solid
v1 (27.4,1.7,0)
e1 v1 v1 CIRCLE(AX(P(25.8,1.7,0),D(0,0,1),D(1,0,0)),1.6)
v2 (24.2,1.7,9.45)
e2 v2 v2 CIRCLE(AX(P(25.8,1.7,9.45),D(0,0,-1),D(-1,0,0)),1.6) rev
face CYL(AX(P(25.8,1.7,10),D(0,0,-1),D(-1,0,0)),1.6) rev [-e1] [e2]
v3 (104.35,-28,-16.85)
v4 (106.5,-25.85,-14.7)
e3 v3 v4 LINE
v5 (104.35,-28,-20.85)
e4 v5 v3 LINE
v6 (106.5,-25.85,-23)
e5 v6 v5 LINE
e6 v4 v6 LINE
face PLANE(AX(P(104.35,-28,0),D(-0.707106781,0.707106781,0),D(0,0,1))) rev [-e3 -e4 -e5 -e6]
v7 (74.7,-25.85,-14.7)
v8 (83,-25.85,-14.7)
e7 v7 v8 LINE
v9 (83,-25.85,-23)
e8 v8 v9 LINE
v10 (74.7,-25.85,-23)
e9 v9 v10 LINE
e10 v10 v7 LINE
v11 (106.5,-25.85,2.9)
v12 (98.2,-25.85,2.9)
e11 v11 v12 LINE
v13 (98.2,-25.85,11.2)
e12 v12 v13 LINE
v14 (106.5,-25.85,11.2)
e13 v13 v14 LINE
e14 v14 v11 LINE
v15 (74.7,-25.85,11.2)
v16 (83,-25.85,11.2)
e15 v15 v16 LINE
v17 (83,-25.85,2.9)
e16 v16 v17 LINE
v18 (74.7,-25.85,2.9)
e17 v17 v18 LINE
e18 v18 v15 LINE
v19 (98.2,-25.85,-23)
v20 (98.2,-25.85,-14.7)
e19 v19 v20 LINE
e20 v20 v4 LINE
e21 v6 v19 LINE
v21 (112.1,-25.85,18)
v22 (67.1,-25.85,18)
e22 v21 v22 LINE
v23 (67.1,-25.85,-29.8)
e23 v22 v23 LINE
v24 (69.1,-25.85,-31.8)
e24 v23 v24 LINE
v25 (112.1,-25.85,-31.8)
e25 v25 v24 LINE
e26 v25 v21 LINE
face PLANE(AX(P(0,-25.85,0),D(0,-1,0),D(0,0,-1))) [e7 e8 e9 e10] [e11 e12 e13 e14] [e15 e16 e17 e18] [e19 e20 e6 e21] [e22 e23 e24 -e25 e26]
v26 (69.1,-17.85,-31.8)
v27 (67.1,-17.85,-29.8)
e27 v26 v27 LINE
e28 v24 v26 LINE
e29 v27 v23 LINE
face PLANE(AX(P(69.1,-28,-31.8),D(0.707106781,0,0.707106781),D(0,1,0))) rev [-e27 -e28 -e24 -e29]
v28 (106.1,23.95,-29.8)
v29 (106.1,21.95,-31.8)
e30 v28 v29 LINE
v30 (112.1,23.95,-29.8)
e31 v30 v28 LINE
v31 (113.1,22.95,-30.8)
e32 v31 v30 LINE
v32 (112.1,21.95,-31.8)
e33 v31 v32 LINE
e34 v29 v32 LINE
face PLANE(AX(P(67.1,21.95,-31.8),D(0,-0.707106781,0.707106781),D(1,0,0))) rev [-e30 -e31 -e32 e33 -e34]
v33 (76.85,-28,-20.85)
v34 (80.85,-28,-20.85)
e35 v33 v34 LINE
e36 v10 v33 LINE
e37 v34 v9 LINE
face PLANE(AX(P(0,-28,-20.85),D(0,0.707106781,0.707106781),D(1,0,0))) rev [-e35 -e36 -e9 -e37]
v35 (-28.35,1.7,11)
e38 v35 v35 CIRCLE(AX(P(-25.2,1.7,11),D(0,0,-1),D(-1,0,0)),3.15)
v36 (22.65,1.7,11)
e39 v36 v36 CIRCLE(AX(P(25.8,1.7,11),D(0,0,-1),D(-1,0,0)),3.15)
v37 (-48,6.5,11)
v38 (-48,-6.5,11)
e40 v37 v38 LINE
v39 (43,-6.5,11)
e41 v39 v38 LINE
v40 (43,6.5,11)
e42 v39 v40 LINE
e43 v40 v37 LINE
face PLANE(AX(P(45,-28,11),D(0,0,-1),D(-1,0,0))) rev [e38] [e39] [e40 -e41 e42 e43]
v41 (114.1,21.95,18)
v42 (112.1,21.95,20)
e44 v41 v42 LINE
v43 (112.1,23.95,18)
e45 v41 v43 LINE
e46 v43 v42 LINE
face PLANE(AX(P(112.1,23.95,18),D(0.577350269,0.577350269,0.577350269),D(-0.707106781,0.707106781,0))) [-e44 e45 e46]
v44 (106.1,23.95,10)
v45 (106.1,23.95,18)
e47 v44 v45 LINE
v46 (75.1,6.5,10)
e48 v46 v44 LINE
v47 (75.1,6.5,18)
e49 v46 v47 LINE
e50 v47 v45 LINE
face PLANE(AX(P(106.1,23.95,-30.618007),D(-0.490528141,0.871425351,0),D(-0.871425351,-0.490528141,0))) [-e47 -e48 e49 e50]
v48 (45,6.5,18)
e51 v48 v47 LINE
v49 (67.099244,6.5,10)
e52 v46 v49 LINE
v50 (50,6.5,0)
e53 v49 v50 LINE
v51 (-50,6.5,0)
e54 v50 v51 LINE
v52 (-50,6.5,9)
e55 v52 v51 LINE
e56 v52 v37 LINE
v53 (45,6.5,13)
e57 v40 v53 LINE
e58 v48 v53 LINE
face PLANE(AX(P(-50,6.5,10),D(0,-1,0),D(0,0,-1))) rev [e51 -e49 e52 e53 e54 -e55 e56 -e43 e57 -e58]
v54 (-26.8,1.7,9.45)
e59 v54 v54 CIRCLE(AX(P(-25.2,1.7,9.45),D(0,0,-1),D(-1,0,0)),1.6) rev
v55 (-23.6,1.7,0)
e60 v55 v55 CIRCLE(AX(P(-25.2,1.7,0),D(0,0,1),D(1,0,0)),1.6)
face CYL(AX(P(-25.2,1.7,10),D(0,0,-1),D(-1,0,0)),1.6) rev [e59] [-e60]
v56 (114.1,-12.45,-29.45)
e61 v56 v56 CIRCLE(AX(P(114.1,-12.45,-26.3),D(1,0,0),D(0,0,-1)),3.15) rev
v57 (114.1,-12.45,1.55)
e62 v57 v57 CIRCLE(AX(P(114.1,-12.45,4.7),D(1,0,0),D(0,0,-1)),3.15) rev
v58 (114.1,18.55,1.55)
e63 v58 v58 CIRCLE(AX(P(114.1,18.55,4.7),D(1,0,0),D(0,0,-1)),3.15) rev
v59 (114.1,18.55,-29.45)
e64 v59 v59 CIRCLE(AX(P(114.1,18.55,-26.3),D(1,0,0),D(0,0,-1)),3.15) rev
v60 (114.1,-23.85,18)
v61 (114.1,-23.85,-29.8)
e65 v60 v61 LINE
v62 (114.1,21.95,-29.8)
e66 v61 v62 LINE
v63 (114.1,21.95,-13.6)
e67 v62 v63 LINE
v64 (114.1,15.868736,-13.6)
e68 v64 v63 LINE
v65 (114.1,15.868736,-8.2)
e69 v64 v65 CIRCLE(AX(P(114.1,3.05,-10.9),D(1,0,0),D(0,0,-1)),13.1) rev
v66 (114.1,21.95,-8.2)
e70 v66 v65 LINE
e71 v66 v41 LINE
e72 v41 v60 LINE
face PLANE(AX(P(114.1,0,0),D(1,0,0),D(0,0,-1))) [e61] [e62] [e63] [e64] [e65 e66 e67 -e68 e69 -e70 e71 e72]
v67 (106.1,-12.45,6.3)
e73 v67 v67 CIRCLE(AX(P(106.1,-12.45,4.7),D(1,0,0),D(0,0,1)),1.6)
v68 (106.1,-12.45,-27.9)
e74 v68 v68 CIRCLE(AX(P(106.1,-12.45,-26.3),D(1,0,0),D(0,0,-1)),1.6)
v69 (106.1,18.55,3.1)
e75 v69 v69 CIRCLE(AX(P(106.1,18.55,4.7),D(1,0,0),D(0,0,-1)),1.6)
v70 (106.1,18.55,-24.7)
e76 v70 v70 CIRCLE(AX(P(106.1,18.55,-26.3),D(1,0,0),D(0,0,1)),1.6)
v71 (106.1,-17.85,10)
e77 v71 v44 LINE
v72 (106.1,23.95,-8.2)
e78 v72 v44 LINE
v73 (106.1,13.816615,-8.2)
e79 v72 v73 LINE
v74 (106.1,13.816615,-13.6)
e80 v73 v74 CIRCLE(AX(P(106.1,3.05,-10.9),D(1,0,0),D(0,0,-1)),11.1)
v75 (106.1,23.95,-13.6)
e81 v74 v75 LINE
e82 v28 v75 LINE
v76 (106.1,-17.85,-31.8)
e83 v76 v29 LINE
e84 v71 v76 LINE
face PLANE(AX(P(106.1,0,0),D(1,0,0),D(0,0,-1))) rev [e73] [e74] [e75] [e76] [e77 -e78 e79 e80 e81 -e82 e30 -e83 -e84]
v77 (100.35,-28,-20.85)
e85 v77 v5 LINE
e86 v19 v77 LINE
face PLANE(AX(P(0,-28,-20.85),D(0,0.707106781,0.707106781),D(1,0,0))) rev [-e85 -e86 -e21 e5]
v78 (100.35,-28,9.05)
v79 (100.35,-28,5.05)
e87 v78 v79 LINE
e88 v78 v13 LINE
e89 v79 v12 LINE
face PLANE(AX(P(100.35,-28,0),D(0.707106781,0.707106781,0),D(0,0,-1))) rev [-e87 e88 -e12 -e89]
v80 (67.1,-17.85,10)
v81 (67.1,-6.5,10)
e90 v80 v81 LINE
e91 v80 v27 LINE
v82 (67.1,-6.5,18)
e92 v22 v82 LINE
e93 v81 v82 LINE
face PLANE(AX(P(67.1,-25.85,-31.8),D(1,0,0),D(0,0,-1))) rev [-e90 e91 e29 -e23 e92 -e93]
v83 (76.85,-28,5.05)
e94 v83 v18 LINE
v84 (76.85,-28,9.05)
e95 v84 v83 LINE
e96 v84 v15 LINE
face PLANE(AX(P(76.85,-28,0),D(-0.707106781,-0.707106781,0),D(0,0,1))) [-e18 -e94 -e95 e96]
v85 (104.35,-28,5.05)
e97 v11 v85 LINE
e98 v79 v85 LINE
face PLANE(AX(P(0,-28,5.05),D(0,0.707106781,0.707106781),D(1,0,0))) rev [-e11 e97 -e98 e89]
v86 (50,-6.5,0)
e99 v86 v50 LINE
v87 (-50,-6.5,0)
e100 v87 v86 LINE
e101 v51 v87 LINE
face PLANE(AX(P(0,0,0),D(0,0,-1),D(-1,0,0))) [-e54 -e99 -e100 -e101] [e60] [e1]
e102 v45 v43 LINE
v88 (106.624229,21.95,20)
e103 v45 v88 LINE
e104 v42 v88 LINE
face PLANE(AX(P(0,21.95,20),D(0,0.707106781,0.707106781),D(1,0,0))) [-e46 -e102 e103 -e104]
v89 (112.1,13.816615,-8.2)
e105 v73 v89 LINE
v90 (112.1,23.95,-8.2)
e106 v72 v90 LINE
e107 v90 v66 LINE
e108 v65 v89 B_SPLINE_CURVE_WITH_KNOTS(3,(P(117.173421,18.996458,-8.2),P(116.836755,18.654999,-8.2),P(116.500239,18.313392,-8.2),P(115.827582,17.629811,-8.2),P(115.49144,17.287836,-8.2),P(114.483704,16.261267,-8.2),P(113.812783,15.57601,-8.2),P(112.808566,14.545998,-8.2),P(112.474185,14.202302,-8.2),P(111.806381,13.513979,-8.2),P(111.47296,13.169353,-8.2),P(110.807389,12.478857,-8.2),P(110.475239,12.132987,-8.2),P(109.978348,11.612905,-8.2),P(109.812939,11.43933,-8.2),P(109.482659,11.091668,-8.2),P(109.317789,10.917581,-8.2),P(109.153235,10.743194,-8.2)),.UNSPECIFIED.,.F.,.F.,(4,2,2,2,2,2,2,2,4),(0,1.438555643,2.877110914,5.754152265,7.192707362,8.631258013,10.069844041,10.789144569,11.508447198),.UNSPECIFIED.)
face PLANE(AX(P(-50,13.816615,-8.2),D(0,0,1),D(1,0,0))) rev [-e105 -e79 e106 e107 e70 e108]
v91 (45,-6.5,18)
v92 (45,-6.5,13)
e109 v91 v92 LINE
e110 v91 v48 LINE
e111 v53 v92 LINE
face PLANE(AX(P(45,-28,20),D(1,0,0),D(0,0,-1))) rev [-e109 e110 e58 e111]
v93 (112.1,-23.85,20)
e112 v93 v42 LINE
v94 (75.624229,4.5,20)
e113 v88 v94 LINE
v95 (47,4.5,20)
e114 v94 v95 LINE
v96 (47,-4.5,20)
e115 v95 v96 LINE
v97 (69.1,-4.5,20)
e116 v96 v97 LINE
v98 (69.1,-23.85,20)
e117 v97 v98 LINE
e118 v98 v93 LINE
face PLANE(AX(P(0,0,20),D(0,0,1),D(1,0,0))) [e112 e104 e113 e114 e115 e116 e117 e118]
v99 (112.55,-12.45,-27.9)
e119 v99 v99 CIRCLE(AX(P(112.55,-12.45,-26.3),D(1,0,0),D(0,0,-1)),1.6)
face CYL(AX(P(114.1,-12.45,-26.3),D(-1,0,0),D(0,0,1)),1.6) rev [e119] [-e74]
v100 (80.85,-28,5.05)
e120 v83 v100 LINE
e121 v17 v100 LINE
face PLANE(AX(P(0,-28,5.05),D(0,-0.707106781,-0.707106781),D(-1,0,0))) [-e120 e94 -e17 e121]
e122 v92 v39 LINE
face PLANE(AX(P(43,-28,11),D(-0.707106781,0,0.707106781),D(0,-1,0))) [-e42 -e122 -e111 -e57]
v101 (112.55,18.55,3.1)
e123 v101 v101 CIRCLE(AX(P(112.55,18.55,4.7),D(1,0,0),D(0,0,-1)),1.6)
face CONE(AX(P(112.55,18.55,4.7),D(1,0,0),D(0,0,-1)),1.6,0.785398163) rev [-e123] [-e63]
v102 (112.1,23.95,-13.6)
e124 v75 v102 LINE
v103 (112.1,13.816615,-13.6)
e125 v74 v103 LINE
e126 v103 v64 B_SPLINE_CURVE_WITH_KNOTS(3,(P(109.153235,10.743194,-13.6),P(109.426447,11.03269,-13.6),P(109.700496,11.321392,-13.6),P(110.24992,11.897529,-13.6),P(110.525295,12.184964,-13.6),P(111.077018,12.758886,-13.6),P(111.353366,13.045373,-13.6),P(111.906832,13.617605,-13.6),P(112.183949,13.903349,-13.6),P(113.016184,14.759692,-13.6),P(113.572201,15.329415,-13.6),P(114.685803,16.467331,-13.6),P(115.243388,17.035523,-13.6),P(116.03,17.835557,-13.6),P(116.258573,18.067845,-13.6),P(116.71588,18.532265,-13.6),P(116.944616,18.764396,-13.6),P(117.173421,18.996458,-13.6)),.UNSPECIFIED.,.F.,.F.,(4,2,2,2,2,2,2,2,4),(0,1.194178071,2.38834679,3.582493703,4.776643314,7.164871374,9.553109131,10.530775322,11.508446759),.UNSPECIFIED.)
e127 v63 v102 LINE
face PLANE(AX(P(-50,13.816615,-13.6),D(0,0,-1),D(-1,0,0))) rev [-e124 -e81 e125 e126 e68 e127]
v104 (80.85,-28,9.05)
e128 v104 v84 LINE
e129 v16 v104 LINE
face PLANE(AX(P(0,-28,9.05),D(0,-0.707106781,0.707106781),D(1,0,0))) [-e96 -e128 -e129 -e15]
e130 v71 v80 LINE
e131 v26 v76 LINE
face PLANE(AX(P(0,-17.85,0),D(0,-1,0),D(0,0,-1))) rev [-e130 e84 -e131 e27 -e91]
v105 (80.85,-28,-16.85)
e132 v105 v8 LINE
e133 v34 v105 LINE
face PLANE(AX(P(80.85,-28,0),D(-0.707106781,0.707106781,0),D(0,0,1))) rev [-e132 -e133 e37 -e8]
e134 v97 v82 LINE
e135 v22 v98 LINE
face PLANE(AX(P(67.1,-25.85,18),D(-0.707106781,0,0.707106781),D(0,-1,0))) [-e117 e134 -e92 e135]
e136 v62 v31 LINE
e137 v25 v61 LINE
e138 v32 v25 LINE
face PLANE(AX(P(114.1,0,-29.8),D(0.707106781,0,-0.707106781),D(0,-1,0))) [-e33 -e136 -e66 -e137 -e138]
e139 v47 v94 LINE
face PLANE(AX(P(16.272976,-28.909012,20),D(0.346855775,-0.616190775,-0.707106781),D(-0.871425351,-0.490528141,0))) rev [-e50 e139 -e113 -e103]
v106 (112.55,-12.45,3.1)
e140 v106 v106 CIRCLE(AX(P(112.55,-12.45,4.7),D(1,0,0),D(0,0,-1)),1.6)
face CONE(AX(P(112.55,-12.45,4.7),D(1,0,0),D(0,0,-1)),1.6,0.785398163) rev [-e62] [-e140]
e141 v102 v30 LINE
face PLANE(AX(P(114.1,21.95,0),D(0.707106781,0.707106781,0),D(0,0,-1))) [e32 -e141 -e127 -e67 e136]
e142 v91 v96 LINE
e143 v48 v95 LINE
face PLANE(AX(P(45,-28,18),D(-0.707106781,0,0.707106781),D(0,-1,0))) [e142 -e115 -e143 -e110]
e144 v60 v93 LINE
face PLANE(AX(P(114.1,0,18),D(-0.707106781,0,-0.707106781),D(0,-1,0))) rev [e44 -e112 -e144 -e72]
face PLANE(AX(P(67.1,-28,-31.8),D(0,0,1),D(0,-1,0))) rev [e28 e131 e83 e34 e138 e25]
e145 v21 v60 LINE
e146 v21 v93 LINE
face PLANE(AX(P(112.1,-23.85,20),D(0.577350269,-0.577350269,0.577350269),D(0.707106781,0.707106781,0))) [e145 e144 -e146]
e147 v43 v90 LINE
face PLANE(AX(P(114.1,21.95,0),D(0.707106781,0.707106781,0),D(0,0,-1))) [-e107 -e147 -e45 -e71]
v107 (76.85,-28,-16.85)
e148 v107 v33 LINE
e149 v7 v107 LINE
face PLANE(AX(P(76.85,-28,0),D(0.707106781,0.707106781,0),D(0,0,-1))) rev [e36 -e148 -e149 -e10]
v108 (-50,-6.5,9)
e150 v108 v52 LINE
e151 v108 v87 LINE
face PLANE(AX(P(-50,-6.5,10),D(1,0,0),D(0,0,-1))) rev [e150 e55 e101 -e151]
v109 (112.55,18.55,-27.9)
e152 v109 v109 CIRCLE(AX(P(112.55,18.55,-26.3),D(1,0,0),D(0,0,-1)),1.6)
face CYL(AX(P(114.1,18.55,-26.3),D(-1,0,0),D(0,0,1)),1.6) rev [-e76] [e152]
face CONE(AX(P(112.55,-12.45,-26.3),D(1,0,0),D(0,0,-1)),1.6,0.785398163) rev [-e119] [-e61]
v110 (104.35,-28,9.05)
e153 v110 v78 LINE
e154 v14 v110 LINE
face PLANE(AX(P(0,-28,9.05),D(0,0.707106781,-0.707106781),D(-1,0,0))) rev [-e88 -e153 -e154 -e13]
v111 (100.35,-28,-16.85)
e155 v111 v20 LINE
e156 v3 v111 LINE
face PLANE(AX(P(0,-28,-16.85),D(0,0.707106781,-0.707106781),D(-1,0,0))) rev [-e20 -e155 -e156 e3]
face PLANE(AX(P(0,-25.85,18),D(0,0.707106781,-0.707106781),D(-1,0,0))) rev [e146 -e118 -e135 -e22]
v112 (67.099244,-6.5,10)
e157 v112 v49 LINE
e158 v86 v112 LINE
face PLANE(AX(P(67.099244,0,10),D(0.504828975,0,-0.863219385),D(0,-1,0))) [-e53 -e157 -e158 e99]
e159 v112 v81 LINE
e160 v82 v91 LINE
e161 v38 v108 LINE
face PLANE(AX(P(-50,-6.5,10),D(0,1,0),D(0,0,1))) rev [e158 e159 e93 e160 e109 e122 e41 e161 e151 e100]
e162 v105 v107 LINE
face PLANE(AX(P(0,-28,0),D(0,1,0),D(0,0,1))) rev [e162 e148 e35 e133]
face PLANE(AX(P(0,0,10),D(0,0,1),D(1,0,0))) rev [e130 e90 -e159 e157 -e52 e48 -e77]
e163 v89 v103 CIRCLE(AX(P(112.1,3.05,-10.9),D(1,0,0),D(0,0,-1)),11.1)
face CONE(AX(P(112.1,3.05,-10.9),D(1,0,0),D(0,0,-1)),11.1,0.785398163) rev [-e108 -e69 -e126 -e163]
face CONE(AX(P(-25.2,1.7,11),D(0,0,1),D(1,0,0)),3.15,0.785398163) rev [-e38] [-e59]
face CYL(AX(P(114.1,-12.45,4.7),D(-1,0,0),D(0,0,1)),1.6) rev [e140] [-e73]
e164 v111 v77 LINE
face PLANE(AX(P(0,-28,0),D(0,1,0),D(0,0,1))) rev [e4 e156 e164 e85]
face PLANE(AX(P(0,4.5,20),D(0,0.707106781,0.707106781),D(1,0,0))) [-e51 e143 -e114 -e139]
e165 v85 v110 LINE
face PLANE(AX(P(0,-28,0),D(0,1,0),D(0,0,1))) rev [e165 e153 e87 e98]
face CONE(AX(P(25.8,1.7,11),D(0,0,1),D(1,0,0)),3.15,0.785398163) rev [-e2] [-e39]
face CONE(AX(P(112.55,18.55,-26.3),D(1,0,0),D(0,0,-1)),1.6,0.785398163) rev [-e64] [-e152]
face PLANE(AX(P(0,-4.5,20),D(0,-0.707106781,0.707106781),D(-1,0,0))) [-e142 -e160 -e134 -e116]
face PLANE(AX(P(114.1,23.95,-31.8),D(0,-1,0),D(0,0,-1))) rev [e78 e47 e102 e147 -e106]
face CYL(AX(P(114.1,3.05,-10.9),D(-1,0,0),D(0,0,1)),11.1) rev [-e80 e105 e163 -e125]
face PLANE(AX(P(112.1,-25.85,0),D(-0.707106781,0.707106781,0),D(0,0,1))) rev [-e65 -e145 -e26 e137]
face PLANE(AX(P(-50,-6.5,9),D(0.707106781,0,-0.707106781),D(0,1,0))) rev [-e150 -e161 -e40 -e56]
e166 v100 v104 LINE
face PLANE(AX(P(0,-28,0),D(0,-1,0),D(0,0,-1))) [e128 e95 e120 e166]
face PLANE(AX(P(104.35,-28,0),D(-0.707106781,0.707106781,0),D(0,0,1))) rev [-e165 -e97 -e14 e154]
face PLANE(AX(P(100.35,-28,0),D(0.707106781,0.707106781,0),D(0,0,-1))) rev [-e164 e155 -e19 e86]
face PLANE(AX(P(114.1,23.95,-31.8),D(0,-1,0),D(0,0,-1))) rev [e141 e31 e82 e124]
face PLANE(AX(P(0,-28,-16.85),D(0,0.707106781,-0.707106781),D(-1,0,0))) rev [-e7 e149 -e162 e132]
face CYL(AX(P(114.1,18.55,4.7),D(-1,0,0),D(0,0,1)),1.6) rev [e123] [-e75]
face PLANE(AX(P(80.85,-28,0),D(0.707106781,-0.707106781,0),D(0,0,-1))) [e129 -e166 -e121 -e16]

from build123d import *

# Parameters (mm, degrees)
SKETCH1_W           = 100
SKETCH1_H           = 13
SKETCH1_R           = 1.6
BOSS_EXTRUDE1_DEPTH = 10
SKETCH2_R           = 1.6
BOSS_EXTRUDE2_DEPTH = 10
SKETCH4_R           = 1.6
SKETCH4_R_2         = 11.1
BOSS_EXTRUDE3_DEPTH = 8
SKETCH5_W           = 47
SKETCH5_H           = 51.8
BOSS_EXTRUDE4_DEPTH = 8
SKETCH6_W           = 39
SKETCH6_H           = 11.35
BOSS_EXTRUDE5_DEPTH = 10
BOSS_EXTRUDE6_DEPTH = 8
SKETCH8_W           = 10
SKETCH8_H           = 10
BOSS_EXTRUDE7_DEPTH = 2.15
CHAMFER1_SIZE2      = 17.09924405
CHAMFER1_SIZE       = 10
CHAMFER3_SIZE       = 2
CHAMFER4_SIZE       = 3
CHAMFER5_SIZE       = 1.55
SKETCH9_W           = 95
SKETCH9_H           = 9
CUT_EXTRUDE1_DEPTH  = 126.670601176
CHAMFER6_SIZE       = 1.55
CHAMFER7_SIZE       = 2
SKETCH11_W          = 47
SKETCH11_H          = 8
CUT_EXTRUDE3_DEPTH  = 132.535746092
CUT_EXTRUDE4_DEPTH  = 170.481709928
CHAMFER9_SIZE       = 2


# Some blends are built 0.0001 mm under size
with BuildPart() as part:
    # Sketch1 → Boss-Extrude1 (new body)
    with BuildSketch(Plane.XY):
        Rectangle(SKETCH1_W, SKETCH1_H)
        with Locations((25.8, 1.7)):
            Circle(SKETCH1_R, mode=Mode.SUBTRACT)
        with Locations((-25.2, 1.7)):
            Circle(SKETCH1_R, mode=Mode.SUBTRACT)
    extrude(amount=BOSS_EXTRUDE1_DEPTH)

    # Sketch2 → Boss-Extrude2 (add)
    with BuildSketch(Plane.XY.offset(10)):
        Polygon((50, -6.5), (106.1, -6.5), (106.1, 6.5), (50, 6.5), (-50, 6.5), (-50, -6.5), align=None)
        with Locations((25.8, 1.7)):
            Circle(SKETCH2_R, mode=Mode.SUBTRACT)
        with Locations((-25.2, 1.7)):
            Circle(SKETCH2_R, mode=Mode.SUBTRACT)
    extrude(amount=BOSS_EXTRUDE2_DEPTH)

    # Sketch4 → Boss-Extrude3 (add)
    with BuildSketch(Plane(origin=(106.1, 0, 0), x_dir=(0, 0, -1), z_dir=(1, 0, 0))):
        Polygon((-20, -6.5), (-20, -17.85), (31.8, -17.85), (31.8, 23.95), (-20, 23.95), align=None)
        with Locations((-4.7, 18.55)):
            Circle(SKETCH4_R, mode=Mode.SUBTRACT)
        with Locations(Location((26.3, 18.55, 0), (0, 0, 180))):
            Circle(SKETCH4_R, mode=Mode.SUBTRACT)
        with Locations((26.3, -12.45)):
            Circle(SKETCH4_R, mode=Mode.SUBTRACT)
        with Locations(Location((-4.7, -12.45, 0), (0, 0, 180))):
            Circle(SKETCH4_R, mode=Mode.SUBTRACT)
        with Locations((10.9, 3.05)):
            Circle(SKETCH4_R_2, mode=Mode.SUBTRACT)
    extrude(amount=BOSS_EXTRUDE3_DEPTH)

    # Sketch5 → Boss-Extrude4 (add)
    with BuildSketch(Plane.XZ.offset(17.85)):
        with Locations((90.6, -5.9)):
            Rectangle(SKETCH5_W, SKETCH5_H)
    extrude(amount=BOSS_EXTRUDE4_DEPTH)

    # Sketch6 → Boss-Extrude5 (add)
    with BuildSketch(Plane.XY.offset(20)):
        Polygon((106.1, 23.95), (75.1, 6.5), (106.1, 6.5), align=None)
        with Locations((86.6, -12.175)):
            Rectangle(SKETCH6_W, SKETCH6_H)
    extrude(amount=-BOSS_EXTRUDE5_DEPTH)

    # Sketch7 → Boss-Extrude6 (add)
    with BuildSketch(Plane(origin=(0, 0, -31.8), x_dir=(-1, 0, 0), z_dir=(0, 0, -1))):
        Polygon((-67.1, -17.85), (-67.1, -6.5), (-67.1, 1.996774194), (-106.1, 23.95), (-114.1, 23.95), (-114.1, -25.85), (-67.1, -25.85), align=None)
    extrude(amount=BOSS_EXTRUDE6_DEPTH)

    # Sketch8 → Boss-Extrude7 (add)
    with BuildSketch(Plane.XZ.offset(25.85)):
        with Locations((78.85, 7.05)):
            Rectangle(SKETCH8_W, SKETCH8_H)
        with Locations((102.35, 7.05)):
            Rectangle(SKETCH8_W, SKETCH8_H)
        with Locations((102.35, -18.85)):
            Rectangle(SKETCH8_W, SKETCH8_H)
        with Locations((78.85, -18.85)):
            Rectangle(SKETCH8_W, SKETCH8_H)
    extrude(amount=BOSS_EXTRUDE7_DEPTH)

    # Chamfer1
    chamfer1_edges = [part.edges().sort_by_distance(p)[0] for p in [
        (50, 0, 10),
    ]]
    chamfer1_side = [part.faces().sort_by_distance(p)[0] for p in [
        (50, 0, 9.8),
    ]]
    chamfer(chamfer1_edges, length=CHAMFER1_SIZE - 0.0001, length2=CHAMFER1_SIZE2 - 0.0001, reference=chamfer1_side[0])  # a hair under: the kernel refuses the full size

    # Chamfer3
    chamfer3_edges = [part.edges().sort_by_distance(p)[0] for p in [
        (86.6, 12.973387097, -39.8),
        (110.1, 23.95, -39.8),
        (114.1, -0.95, -39.8),
        (90.6, -25.85, -39.8),
        (-50, 0, 20),
        (114.1, -0.95, 20),
        (114.1, 23.95, -9.9),
        (110.1, 23.95, 20),
        (114.1, 3.05, 0.2),
        (67.1, -16.175, 20),
        (114.1, -25.85, -9.9),
        (90.6, -25.85, 20),
    ]]
    chamfer(chamfer3_edges, length=CHAMFER3_SIZE)

    # Chamfer4
    # the kernel refuses this chamfer: 3 mm, written as the material it takes off along each edge
    with BuildSketch(Plane(origin=(115.065048964, -28, 2.05), x_dir=(0, -0.027495876610586775, 0.9996219169112968), z_dir=(-1, 0, 0))) as chamfer4_piece_1_section:
        Polygon((CHAMFER4_SIZE * 0.999621916911, CHAMFER4_SIZE * 0.0274958766106), (-CHAMFER4_SIZE * 0.0274958766106, CHAMFER4_SIZE * 0.999621916911), (0, 0), align=None)
    chamfer4_piece_1 = extrude(amount=25.430097928, mode=Mode.PRIVATE)
    chamfer4_piece_1 = split(chamfer4_piece_1, bisect_by=Plane(origin=(102.35, -25.85, 3.119652888), z_dir=(0, -1, 0)), keep=Keep.TOP, mode=Mode.PRIVATE)
    add(chamfer4_piece_1, mode=Mode.SUBTRACT)
    with BuildSketch(Plane(origin=(97.35, -28, -5.665048964), x_dir=(0.9996219169112965, -0.02749587661058676, 0), z_dir=(0, 0, 1))) as chamfer4_piece_2_section:
        Polygon((CHAMFER4_SIZE * 0.999621916911, CHAMFER4_SIZE * 0.0274958766106), (-CHAMFER4_SIZE * 0.0274958766106, CHAMFER4_SIZE * 0.999621916911), (0, 0), align=None)
    chamfer4_piece_2 = extrude(amount=25.430097928, mode=Mode.PRIVATE)
    chamfer4_piece_2 = split(chamfer4_piece_2, bisect_by=Plane(origin=(98.419652888, -25.85, 7.05), z_dir=(0, -1, 0)), keep=Keep.TOP, mode=Mode.PRIVATE)
    add(chamfer4_piece_2, mode=Mode.SUBTRACT)
    with BuildSketch(Plane(origin=(89.634951036, -28, 12.05), x_dir=(0, -0.02749587661058678, -0.9996219169112968), z_dir=(1, 0, 0))) as chamfer4_piece_3_section:
        Polygon((CHAMFER4_SIZE * 0.999621916911, CHAMFER4_SIZE * 0.0274958766106), (-CHAMFER4_SIZE * 0.0274958766106, CHAMFER4_SIZE * 0.999621916911), (0, 0), align=None)
    chamfer4_piece_3 = extrude(amount=25.430097928, mode=Mode.PRIVATE)
    chamfer4_piece_3 = split(chamfer4_piece_3, bisect_by=Plane(origin=(102.35, -25.85, 10.980347112), z_dir=(0, -1, 0)), keep=Keep.TOP, mode=Mode.PRIVATE)
    add(chamfer4_piece_3, mode=Mode.SUBTRACT)
    with BuildSketch(Plane(origin=(107.35, -28, 19.765048964), x_dir=(0.027495876610586768, 0.9996219169112968, 0), z_dir=(0, 0, -1))) as chamfer4_piece_4_section:
        Polygon((CHAMFER4_SIZE * 0.999621916911, -CHAMFER4_SIZE * 0.0274958766106), (-CHAMFER4_SIZE * 0.0274958766106, -CHAMFER4_SIZE * 0.999621916911), (0, 0), align=None)
    chamfer4_piece_4 = extrude(amount=25.430097928, mode=Mode.PRIVATE)
    chamfer4_piece_4 = split(chamfer4_piece_4, bisect_by=Plane(origin=(106.280347112, -25.85, 7.05), z_dir=(0, -1, 0)), keep=Keep.TOP, mode=Mode.PRIVATE)
    add(chamfer4_piece_4, mode=Mode.SUBTRACT)
    with BuildSketch(Plane(origin=(91.565048964, -28, 2.05), x_dir=(0, -0.027495876610586775, 0.9996219169112968), z_dir=(-1, 0, 0))) as chamfer4_piece_5_section:
        Polygon((CHAMFER4_SIZE * 0.999621916911, CHAMFER4_SIZE * 0.0274958766106), (-CHAMFER4_SIZE * 0.0274958766106, CHAMFER4_SIZE * 0.999621916911), (0, 0), align=None)
    chamfer4_piece_5 = extrude(amount=25.430097928, mode=Mode.PRIVATE)
    chamfer4_piece_5 = split(chamfer4_piece_5, bisect_by=Plane(origin=(78.85, -25.85, 3.119652888), z_dir=(0, -1, 0)), keep=Keep.TOP, mode=Mode.PRIVATE)
    add(chamfer4_piece_5, mode=Mode.SUBTRACT)
    with BuildSketch(Plane(origin=(73.85, -28, -5.665048964), x_dir=(-0.027495876610586768, 0.9996219169112968, 0), z_dir=(0, 0, 1))) as chamfer4_piece_6_section:
        Polygon((CHAMFER4_SIZE * 0.999621916911, -CHAMFER4_SIZE * 0.0274958766106), (-CHAMFER4_SIZE * 0.0274958766106, -CHAMFER4_SIZE * 0.999621916911), (0, 0), align=None)
    chamfer4_piece_6 = extrude(amount=25.430097928, mode=Mode.PRIVATE)
    chamfer4_piece_6 = split(chamfer4_piece_6, bisect_by=Plane(origin=(74.919652888, -25.85, 7.05), z_dir=(0, -1, 0)), keep=Keep.TOP, mode=Mode.PRIVATE)
    add(chamfer4_piece_6, mode=Mode.SUBTRACT)
    with BuildSketch(Plane(origin=(66.134951036, -28, 12.05), x_dir=(0, -0.02749587661058678, -0.9996219169112968), z_dir=(1, 0, 0))) as chamfer4_piece_7_section:
        Polygon((CHAMFER4_SIZE * 0.999621916911, CHAMFER4_SIZE * 0.0274958766106), (-CHAMFER4_SIZE * 0.0274958766106, CHAMFER4_SIZE * 0.999621916911), (0, 0), align=None)
    chamfer4_piece_7 = extrude(amount=25.430097928, mode=Mode.PRIVATE)
    chamfer4_piece_7 = split(chamfer4_piece_7, bisect_by=Plane(origin=(78.85, -25.85, 10.980347112), z_dir=(0, -1, 0)), keep=Keep.TOP, mode=Mode.PRIVATE)
    add(chamfer4_piece_7, mode=Mode.SUBTRACT)
    with BuildSketch(Plane(origin=(83.85, -28, 19.765048964), x_dir=(-0.9996219169112965, -0.02749587661058676, 0), z_dir=(0, 0, -1))) as chamfer4_piece_8_section:
        Polygon((CHAMFER4_SIZE * 0.999621916911, CHAMFER4_SIZE * 0.0274958766106), (-CHAMFER4_SIZE * 0.0274958766106, CHAMFER4_SIZE * 0.999621916911), (0, 0), align=None)
    chamfer4_piece_8 = extrude(amount=25.430097928, mode=Mode.PRIVATE)
    chamfer4_piece_8 = split(chamfer4_piece_8, bisect_by=Plane(origin=(82.780347112, -25.85, 7.05), z_dir=(0, -1, 0)), keep=Keep.TOP, mode=Mode.PRIVATE)
    add(chamfer4_piece_8, mode=Mode.SUBTRACT)
    with BuildSketch(Plane(origin=(97.35, -28, -6.134951036), x_dir=(0.9996219169112965, -0.02749587661058676, 0), z_dir=(0, 0, -1))) as chamfer4_piece_9_section:
        Polygon((CHAMFER4_SIZE * 0.999621916911, -CHAMFER4_SIZE * 0.0274958766106), (-CHAMFER4_SIZE * 0.0274958766106, -CHAMFER4_SIZE * 0.999621916911), (0, 0), align=None)
    chamfer4_piece_9 = extrude(amount=25.430097928, mode=Mode.PRIVATE)
    chamfer4_piece_9 = split(chamfer4_piece_9, bisect_by=Plane(origin=(98.419652888, -25.85, -18.85), z_dir=(0, -1, 0)), keep=Keep.TOP, mode=Mode.PRIVATE)
    add(chamfer4_piece_9, mode=Mode.SUBTRACT)
    with BuildSketch(Plane(origin=(115.065048964, -28, -13.85), x_dir=(0, -0.027495876610586768, -0.9996219169112968), z_dir=(-1, 0, 0))) as chamfer4_piece_10_section:
        Polygon((CHAMFER4_SIZE * 0.999621916911, -CHAMFER4_SIZE * 0.0274958766106), (-CHAMFER4_SIZE * 0.0274958766106, -CHAMFER4_SIZE * 0.999621916911), (0, 0), align=None)
    chamfer4_piece_10 = extrude(amount=25.430097928, mode=Mode.PRIVATE)
    chamfer4_piece_10 = split(chamfer4_piece_10, bisect_by=Plane(origin=(102.35, -25.85, -14.919652888), z_dir=(0, -1, 0)), keep=Keep.TOP, mode=Mode.PRIVATE)
    add(chamfer4_piece_10, mode=Mode.SUBTRACT)
    with BuildSketch(Plane(origin=(107.35, -28, -31.565048964), x_dir=(0.027495876610586768, 0.9996219169112968, 0), z_dir=(0, 0, 1))) as chamfer4_piece_11_section:
        Polygon((CHAMFER4_SIZE * 0.999621916911, CHAMFER4_SIZE * 0.0274958766106), (-CHAMFER4_SIZE * 0.0274958766106, CHAMFER4_SIZE * 0.999621916911), (0, 0), align=None)
    chamfer4_piece_11 = extrude(amount=25.430097928, mode=Mode.PRIVATE)
    chamfer4_piece_11 = split(chamfer4_piece_11, bisect_by=Plane(origin=(106.280347112, -25.85, -18.85), z_dir=(0, -1, 0)), keep=Keep.TOP, mode=Mode.PRIVATE)
    add(chamfer4_piece_11, mode=Mode.SUBTRACT)
    with BuildSketch(Plane(origin=(89.634951036, -28, -23.85), x_dir=(0, -0.027495876610586768, 0.9996219169112968), z_dir=(1, 0, 0))) as chamfer4_piece_12_section:
        Polygon((CHAMFER4_SIZE * 0.999621916911, -CHAMFER4_SIZE * 0.0274958766106), (-CHAMFER4_SIZE * 0.0274958766106, -CHAMFER4_SIZE * 0.999621916911), (0, 0), align=None)
    chamfer4_piece_12 = extrude(amount=25.430097928, mode=Mode.PRIVATE)
    chamfer4_piece_12 = split(chamfer4_piece_12, bisect_by=Plane(origin=(102.35, -25.85, -22.780347112), z_dir=(0, -1, 0)), keep=Keep.TOP, mode=Mode.PRIVATE)
    add(chamfer4_piece_12, mode=Mode.SUBTRACT)
    with BuildSketch(Plane(origin=(66.134951036, -28, -13.85), x_dir=(0, -0.027495876610586768, -0.9996219169112968), z_dir=(1, 0, 0))) as chamfer4_piece_13_section:
        Polygon((CHAMFER4_SIZE * 0.999621916911, CHAMFER4_SIZE * 0.0274958766106), (-CHAMFER4_SIZE * 0.0274958766106, CHAMFER4_SIZE * 0.999621916911), (0, 0), align=None)
    chamfer4_piece_13 = extrude(amount=25.430097928, mode=Mode.PRIVATE)
    chamfer4_piece_13 = split(chamfer4_piece_13, bisect_by=Plane(origin=(78.85, -25.85, -14.919652888), z_dir=(0, -1, 0)), keep=Keep.TOP, mode=Mode.PRIVATE)
    add(chamfer4_piece_13, mode=Mode.SUBTRACT)
    with BuildSketch(Plane(origin=(83.85, -28, -6.134951036), x_dir=(-0.9996219169112965, -0.02749587661058676, 0), z_dir=(0, 0, -1))) as chamfer4_piece_14_section:
        Polygon((CHAMFER4_SIZE * 0.999621916911, CHAMFER4_SIZE * 0.0274958766106), (-CHAMFER4_SIZE * 0.0274958766106, CHAMFER4_SIZE * 0.999621916911), (0, 0), align=None)
    chamfer4_piece_14 = extrude(amount=25.430097928, mode=Mode.PRIVATE)
    chamfer4_piece_14 = split(chamfer4_piece_14, bisect_by=Plane(origin=(82.780347112, -25.85, -18.85), z_dir=(0, -1, 0)), keep=Keep.TOP, mode=Mode.PRIVATE)
    add(chamfer4_piece_14, mode=Mode.SUBTRACT)
    with BuildSketch(Plane(origin=(91.565048964, -28, -23.85), x_dir=(0, -0.027495876610586768, 0.9996219169112968), z_dir=(-1, 0, 0))) as chamfer4_piece_15_section:
        Polygon((CHAMFER4_SIZE * 0.999621916911, CHAMFER4_SIZE * 0.0274958766106), (-CHAMFER4_SIZE * 0.0274958766106, CHAMFER4_SIZE * 0.999621916911), (0, 0), align=None)
    chamfer4_piece_15 = extrude(amount=25.430097928, mode=Mode.PRIVATE)
    chamfer4_piece_15 = split(chamfer4_piece_15, bisect_by=Plane(origin=(78.85, -25.85, -22.780347112), z_dir=(0, -1, 0)), keep=Keep.TOP, mode=Mode.PRIVATE)
    add(chamfer4_piece_15, mode=Mode.SUBTRACT)
    with BuildSketch(Plane(origin=(73.85, -28, -31.565048964), x_dir=(-0.027495876610586768, 0.9996219169112968, 0), z_dir=(0, 0, 1))) as chamfer4_piece_16_section:
        Polygon((CHAMFER4_SIZE * 0.999621916911, -CHAMFER4_SIZE * 0.0274958766106), (-CHAMFER4_SIZE * 0.0274958766106, -CHAMFER4_SIZE * 0.999621916911), (0, 0), align=None)
    chamfer4_piece_16 = extrude(amount=25.430097928, mode=Mode.PRIVATE)
    chamfer4_piece_16 = split(chamfer4_piece_16, bisect_by=Plane(origin=(74.919652888, -25.85, -18.85), z_dir=(0, -1, 0)), keep=Keep.TOP, mode=Mode.PRIVATE)
    add(chamfer4_piece_16, mode=Mode.SUBTRACT)

    # Chamfer5
    chamfer5_edges = [part.edges().sort_by_distance(p)[0] for p in [
        (114.1, 18.55, 6.3),
        (114.1, 18.55, -27.9),
        (114.1, -12.45, -24.7),
        (114.1, -12.45, 3.1),
    ]]
    chamfer(chamfer5_edges, length=CHAMFER5_SIZE)

    # Sketch9 → Cut-Extrude1 (cut, through all)
    with BuildSketch(Plane(origin=(0, 6.5, 0), x_dir=(1, 0, 0), z_dir=(0, 1, 0))):
        with Locations((-2.5, -15.5)):
            Rectangle(SKETCH9_W, SKETCH9_H)
    extrude(amount=-CUT_EXTRUDE1_DEPTH, mode=Mode.SUBTRACT)

    # Chamfer6
    chamfer6_edges = [part.edges().sort_by_distance(p)[0] for p in [
        (24.2, 1.7, 11),
        (-26.8, 1.7, 11),
    ]]
    chamfer(chamfer6_edges, length=CHAMFER6_SIZE)

    # Chamfer7
    chamfer7_edges = [part.edges().sort_by_distance(p)[0] for p in [
        (45, 0, 20),
        (45, 0, 11),
        (-50, 0, 11),
        (88.823495702, 14.225, 20),
        (57.05, -6.5, 20),
        (60.05, 6.5, 20),
    ]]
    chamfer(chamfer7_edges, length=CHAMFER7_SIZE)

    # Sketch11 → Cut-Extrude3 (cut, through all)
    with BuildSketch(Plane(origin=(0, 23.95, 0), x_dir=(1, 0, 0), z_dir=(0, 1, 0))):
        with Locations((90.6, 35.8)):
            Rectangle(SKETCH11_W, SKETCH11_H)
    extrude(amount=-CUT_EXTRUDE3_DEPTH, mode=Mode.SUBTRACT)

    # Sketch13 → Cut-Extrude4 (cut, through all)
    with BuildSketch(Plane(origin=(114.1, 0, 0), x_dir=(0, 0, -1), z_dir=(1, 0, 0))):
        with BuildLine():
            Line((13.6, 13.816615067), (13.6, 23.95))
            Line((13.6, 23.95), (8.2, 23.95))
            Line((8.2, 23.95), (8.2, 13.816615067))
            ThreePointArc((8.2, 13.816615067), (10.9, 14.15), (13.6, 13.816615067))
        make_face()
    extrude(amount=-CUT_EXTRUDE4_DEPTH, mode=Mode.SUBTRACT)

    # Chamfer9
    # the kernel refuses this chamfer: 2 mm, written as the material it takes off along each edge
    with BuildSketch(Plane(origin=(67.1, -12.706634024, -31.8), x_dir=(0.9996219169112968, 0, -0.02749587661058555), z_dir=(0, -1, 0))) as chamfer9_piece_1:
        Polygon((CHAMFER9_SIZE * 0.999621916911, CHAMFER9_SIZE * 0.0274958766106), (-CHAMFER9_SIZE * 0.0274958766106, CHAMFER9_SIZE * 0.999621916911), (0, 0), align=None)
    extrude(amount=18.286731952, mode=Mode.SUBTRACT)
    with BuildSketch(Plane(origin=(100.956634024, 23.95, -31.8), x_dir=(0, 0.027495876610585647, 0.9996219169112968), z_dir=(1, 0, 0))) as chamfer9_piece_2:
        Polygon((CHAMFER9_SIZE * 0.999621916911, CHAMFER9_SIZE * 0.0274958766106), (-CHAMFER9_SIZE * 0.0274958766106, CHAMFER9_SIZE * 0.999621916911), (0, 0), align=None)
    extrude(amount=16.286731952, mode=Mode.SUBTRACT)
    with BuildSketch(Plane(origin=(114.1, 27.093365976, -31.8), x_dir=(0.0274958766105891, 0, 0.9996219169112968), z_dir=(0, -1, 0))) as chamfer9_piece_3:
        Polygon((CHAMFER9_SIZE * 0.999621916911, CHAMFER9_SIZE * 0.0274958766106), (-CHAMFER9_SIZE * 0.0274958766106, CHAMFER9_SIZE * 0.999621916911), (0, 0), align=None)
    extrude(amount=56.086731952, mode=Mode.SUBTRACT)


solid = part.part
